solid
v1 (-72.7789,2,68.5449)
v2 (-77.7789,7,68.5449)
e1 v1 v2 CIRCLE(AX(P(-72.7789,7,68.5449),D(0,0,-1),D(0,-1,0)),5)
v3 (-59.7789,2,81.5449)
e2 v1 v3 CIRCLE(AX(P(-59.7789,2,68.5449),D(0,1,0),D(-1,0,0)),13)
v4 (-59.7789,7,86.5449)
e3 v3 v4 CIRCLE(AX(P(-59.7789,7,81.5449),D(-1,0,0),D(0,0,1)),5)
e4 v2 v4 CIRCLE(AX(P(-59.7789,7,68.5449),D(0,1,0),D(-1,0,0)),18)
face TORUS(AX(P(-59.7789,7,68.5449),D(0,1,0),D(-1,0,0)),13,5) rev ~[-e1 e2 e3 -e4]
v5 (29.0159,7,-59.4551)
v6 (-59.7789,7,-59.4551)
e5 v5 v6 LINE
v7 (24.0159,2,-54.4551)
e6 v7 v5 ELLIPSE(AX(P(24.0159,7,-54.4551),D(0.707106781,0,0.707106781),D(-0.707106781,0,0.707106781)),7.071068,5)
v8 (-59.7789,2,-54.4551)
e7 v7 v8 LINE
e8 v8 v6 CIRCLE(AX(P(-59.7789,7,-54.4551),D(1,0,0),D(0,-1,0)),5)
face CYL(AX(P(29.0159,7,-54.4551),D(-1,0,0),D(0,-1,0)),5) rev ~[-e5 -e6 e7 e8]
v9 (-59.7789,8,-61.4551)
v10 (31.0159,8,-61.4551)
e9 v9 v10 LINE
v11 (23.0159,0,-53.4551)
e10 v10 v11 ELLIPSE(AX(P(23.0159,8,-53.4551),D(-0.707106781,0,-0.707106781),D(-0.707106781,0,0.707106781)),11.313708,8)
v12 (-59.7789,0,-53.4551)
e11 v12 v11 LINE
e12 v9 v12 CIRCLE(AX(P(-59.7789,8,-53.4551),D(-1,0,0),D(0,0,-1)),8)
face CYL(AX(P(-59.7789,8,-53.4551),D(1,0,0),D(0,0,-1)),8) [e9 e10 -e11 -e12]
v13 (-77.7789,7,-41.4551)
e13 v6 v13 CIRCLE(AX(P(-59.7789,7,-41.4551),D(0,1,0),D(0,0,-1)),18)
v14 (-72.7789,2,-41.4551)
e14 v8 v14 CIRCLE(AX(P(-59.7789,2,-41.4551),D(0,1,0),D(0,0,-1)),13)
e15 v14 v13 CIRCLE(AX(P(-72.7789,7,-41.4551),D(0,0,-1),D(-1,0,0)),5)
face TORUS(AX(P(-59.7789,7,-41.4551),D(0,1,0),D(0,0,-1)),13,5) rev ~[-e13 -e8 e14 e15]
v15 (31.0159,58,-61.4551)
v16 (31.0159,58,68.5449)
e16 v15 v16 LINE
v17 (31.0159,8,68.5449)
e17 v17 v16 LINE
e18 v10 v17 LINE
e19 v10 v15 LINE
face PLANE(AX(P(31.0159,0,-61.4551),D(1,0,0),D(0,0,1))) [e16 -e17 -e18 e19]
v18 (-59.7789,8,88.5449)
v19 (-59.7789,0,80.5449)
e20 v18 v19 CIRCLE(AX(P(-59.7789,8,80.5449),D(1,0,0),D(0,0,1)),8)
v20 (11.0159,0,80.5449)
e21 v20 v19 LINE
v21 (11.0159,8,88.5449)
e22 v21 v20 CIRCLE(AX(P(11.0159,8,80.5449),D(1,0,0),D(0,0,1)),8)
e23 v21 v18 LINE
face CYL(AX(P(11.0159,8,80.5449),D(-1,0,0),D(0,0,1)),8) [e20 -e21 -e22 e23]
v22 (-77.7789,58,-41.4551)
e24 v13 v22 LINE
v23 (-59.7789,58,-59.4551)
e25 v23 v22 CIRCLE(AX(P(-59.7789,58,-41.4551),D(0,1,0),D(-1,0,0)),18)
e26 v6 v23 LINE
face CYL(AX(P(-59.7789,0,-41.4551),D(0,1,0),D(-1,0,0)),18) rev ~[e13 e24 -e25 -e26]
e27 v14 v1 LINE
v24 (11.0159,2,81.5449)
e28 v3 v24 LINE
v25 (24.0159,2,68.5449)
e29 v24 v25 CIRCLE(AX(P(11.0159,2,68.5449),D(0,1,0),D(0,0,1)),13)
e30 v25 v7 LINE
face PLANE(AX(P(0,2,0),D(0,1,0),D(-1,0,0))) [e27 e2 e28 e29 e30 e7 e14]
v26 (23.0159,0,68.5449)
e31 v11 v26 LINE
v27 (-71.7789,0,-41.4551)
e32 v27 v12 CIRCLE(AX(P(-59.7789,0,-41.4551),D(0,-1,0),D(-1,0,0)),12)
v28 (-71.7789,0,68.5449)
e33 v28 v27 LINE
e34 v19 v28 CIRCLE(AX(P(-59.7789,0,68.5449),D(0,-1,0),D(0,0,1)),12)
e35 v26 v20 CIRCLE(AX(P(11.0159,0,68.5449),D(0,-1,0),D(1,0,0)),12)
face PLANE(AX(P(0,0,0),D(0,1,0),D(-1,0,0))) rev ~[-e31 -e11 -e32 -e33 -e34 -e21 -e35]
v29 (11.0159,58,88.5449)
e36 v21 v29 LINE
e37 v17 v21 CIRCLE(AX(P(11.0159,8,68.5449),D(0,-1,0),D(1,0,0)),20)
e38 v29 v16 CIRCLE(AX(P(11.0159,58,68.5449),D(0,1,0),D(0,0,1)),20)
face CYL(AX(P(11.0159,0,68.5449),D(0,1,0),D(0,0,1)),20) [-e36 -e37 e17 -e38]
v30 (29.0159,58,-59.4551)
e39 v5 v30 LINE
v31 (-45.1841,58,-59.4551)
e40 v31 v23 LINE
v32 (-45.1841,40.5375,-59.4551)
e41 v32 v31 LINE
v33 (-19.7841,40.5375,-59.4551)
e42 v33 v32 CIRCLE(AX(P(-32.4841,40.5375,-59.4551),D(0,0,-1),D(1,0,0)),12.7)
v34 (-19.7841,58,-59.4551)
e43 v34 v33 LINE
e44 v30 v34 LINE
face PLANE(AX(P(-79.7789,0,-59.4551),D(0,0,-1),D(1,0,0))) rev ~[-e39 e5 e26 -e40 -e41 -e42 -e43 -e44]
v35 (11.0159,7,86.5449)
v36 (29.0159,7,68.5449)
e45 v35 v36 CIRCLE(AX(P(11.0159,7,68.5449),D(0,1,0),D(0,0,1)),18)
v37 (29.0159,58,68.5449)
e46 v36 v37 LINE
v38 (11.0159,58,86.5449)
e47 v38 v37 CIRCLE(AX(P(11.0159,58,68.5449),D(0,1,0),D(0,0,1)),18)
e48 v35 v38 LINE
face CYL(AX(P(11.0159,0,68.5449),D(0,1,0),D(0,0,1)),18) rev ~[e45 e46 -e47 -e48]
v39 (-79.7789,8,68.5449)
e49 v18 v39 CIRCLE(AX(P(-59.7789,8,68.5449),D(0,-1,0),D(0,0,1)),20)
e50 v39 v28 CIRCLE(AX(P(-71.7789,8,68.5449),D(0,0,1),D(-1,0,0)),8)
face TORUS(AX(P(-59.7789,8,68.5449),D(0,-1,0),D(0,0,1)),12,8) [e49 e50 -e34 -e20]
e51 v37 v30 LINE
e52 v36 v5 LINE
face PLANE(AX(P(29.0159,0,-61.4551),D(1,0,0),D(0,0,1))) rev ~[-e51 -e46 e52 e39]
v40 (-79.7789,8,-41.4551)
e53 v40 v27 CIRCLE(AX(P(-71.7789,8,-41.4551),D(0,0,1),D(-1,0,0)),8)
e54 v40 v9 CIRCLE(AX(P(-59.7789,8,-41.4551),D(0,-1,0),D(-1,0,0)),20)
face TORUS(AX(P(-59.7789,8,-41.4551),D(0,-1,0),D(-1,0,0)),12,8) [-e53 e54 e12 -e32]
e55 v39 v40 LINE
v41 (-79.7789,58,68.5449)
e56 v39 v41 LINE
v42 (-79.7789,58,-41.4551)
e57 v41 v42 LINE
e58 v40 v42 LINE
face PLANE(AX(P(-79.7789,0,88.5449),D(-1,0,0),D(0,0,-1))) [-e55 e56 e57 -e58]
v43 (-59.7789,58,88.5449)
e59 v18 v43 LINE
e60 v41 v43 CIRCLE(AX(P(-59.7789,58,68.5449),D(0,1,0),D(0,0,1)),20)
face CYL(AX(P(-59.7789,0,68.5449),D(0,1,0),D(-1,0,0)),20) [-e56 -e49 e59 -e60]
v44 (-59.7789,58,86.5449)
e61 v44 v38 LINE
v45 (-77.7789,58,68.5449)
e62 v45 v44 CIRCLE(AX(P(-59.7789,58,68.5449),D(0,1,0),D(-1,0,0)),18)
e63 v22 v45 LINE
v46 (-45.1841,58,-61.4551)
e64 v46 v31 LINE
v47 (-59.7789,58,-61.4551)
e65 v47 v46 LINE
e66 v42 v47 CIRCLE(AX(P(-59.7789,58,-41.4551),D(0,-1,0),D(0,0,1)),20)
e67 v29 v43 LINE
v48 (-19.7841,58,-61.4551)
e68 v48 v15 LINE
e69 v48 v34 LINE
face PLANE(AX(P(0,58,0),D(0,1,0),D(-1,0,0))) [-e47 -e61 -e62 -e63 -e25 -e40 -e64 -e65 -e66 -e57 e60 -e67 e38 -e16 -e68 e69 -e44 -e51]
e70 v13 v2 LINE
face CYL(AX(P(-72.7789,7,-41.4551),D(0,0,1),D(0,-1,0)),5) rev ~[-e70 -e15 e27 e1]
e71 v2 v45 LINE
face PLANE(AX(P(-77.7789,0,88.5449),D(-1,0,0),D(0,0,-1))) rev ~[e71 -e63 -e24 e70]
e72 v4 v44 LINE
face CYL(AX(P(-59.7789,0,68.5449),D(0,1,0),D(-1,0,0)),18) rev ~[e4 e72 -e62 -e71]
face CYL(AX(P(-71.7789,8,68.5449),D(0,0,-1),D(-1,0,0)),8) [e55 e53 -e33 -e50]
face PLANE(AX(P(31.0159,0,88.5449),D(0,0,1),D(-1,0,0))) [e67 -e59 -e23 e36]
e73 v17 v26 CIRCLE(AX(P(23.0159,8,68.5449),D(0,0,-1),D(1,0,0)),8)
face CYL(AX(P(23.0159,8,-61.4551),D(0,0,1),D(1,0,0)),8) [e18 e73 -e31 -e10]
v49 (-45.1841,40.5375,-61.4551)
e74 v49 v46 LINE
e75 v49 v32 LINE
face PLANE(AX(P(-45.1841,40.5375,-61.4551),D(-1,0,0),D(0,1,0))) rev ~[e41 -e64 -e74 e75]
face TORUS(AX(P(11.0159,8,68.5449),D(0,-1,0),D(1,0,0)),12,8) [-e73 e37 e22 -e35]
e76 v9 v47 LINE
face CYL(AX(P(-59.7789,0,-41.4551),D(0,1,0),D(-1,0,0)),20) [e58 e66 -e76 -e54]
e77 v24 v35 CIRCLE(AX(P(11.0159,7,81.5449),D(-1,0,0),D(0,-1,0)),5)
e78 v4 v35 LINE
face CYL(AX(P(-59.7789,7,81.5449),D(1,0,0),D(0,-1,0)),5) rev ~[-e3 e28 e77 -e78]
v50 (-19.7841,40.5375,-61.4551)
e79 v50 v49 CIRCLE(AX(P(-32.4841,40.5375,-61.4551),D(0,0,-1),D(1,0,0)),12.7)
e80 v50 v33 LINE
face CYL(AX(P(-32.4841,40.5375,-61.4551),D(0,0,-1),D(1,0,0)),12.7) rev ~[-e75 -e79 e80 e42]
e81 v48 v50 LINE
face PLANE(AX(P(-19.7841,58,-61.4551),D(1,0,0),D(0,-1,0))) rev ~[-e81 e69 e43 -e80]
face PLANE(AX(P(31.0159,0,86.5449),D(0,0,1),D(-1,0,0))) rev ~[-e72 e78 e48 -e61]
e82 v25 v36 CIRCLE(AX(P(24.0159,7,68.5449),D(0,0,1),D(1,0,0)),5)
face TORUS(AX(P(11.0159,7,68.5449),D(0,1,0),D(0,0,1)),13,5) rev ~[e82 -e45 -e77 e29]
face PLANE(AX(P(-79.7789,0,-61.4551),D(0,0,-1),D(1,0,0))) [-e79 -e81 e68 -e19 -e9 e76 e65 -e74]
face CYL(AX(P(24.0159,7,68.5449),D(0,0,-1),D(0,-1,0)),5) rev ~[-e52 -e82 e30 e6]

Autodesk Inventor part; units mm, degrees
ref_plane "YZ Plane" through (0, 0, 0) normal (1, 0, 0) x (0, 1, 0)
ref_plane "XZ Plane" through (0, 0, 0) normal (0, 1, 0) x (-1, 0, 0)
ref_plane "XY Plane" through (0, 0, 0) normal (0, 0, 1) x (1, 0, 0)
sketch "Sketch1" plane through (0, 0, 0) normal (0, 1, 0) x (-1, 0, 0)
  line L0 (79.7789, 88.5449) -> (79.7789, -61.4551)
  line L1 (79.7789, -61.4551) -> (-31.0159, -61.4551)
  line L2 (-31.0159, -61.4551) -> (-31.0159, 88.5449)
  line L3 (-31.0159, 88.5449) -> (79.7789, 88.5449)
  point P0 (0, 0)
  dimension "d0" = 150
  dimension "d1" = 110.7948
extrude "Body" add sketch "Sketch1" along normal blind 58
fillet "Fillet6" radius 20 1 edges at (-79.7789, 29, -61.4551)
fillet "Fillet4" radius 20 1 edges at (-79.7789, 29, 88.5449)
fillet "Fillet2" radius 20 1 edges at (31.0159, 29, 88.5449)
shell "Shell1" thickness 2 removed faces 1 at (-42.8473, 58, 31.8782)
sketch "Sketch6" plane through (31.0159, 0, -61.4551) normal (0, 0, -1) x (-1, 0, 0)
  line L0 (20.28, 18.92) -> (4.4, 18.92)
  line L1 (4.4, 18.92) -> (4.4, 5.42)
  line L2 (4.4, 5.42) -> (20.28, 5.42)
  line L3 (20.28, 5.42) -> (20.28, 18.92)
  line L4 (0, 9.95) -> (4.4, 9.95) construction
  line L5 (0, 0) -> (0, 58) projected
  line L6 (110.7948, 0) -> (0, 0) projected
  line L7 (15.1382, 0) -> (15.1382, 5.42)
  point P0 (20.28, 13.27)
  point P1 (11.2745, 5.42)
  dimension "d38" = 15.88
  dimension "d39" = 13.5
  dimension "d40" = 4.4
  dimension "d97" = 5.42
extrude "Cut_Ethernet" [suppressed]
sketch "Sketch5" plane through (31.0159, 0, -61.4551) normal (0, 0, -1) x (-1, 0, 0)
  line L0 (24.44, 21.12) -> (37.74, 21.12)
  line L1 (37.74, 21.12) -> (37.74, 5.42)
  line L2 (37.74, 5.42) -> (24.44, 5.42)
  line L3 (24.44, 5.42) -> (24.44, 21.12)
  line L4 (42.44, 10.5231) -> (37.74, 10.5231) construction
  line L5 (28.3152, 0) -> (28.3152, 5.42) construction
  line L6 (20.28, 18.92) -> (20.28, 5.42) projected
  line L7 (20.28, 10.8914) -> (24.44, 10.8914) construction
  line L8 (0, 0) -> (110.7948, 0) projected
  point P0 (31.0159, 0)
  point P1 (24.44, 13.27)
  dimension "d32" = 4.7
  dimension "d33" = 5.42
  dimension "d34" = 13.3
  dimension "d35" = 15.7
  dimension "d62" = 4.16
extrude "Cut_USB1" [suppressed]
sketch "Sketch4" plane through (31.0159, 0, -61.4551) normal (0, 0, -1) x (-1, 0, 0)
  line L0 (46.0437, 0) -> (46.0437, 5.42) construction
  line L1 (110.7948, 0) -> (110.7948, 58) projected
  line L2 (42.44, 5.42) -> (55.74, 5.42)
  line L3 (55.74, 5.42) -> (55.74, 21.12)
  line L4 (55.74, 21.12) -> (42.44, 21.12)
  line L5 (42.44, 21.12) -> (42.44, 5.42)
  line L6 (24.44, 21.12) -> (37.74, 21.12)
  line L7 (37.74, 21.12) -> (37.74, 5.42)
  line L8 (37.74, 5.42) -> (24.44, 5.42)
  line L9 (24.44, 5.42) -> (24.44, 21.12)
  line L10 (42.44, 10.5231) -> (37.74, 10.5231) construction
  line L11 (53.709, 2.22) -> (53.709, 5.42) construction
  line L12 (24.44, 13.27) -> (20.28, 13.27) construction
  line L13 (20.28, 18.92) -> (4.4, 18.92)
  line L14 (4.4, 18.92) -> (4.4, 5.42)
  line L15 (4.4, 5.42) -> (20.28, 5.42)
  line L16 (20.28, 5.42) -> (20.28, 18.92)
  line L17 (36.6745, 2.22) -> (36.6745, 5.42) construction
  line L18 (0, 0) -> (0, 58) projected
  line L19 (31.09, 0) -> (31.09, 5.42) construction
  line L20 (4.4, 5.42) -> (4.4, 18.92) projected
  line L21 (0, 0) -> (110.7948, 0) projected
  line L22 (13.4846, 5.42) -> (13.4846, 0) construction
  point P0 (31.0159, 0)
  point P1 (4.4, 12.17)
  dimension "d16" = 5.42
  dimension "d18" = 13.3
  dimension "d19" = 15.7
  dimension "d20" = 4.7
  dimension "d21" = 3.2
  dimension "d22" = 13.3
  dimension "d23" = 15.7
  dimension "d24" = 4.16
  dimension "d25" = 15.88
  dimension "d26" = 13.5
  dimension "d27" = 3.2
  dimension "d29" = 5.42
  dimension "d98" = 5.42
extrude "Cut_USB2" [suppressed]
fillet "Fillet10" radius 5 7 edges at (-77.7789, 2, 13.5449) (-72.5068, 2, 81.2728) (-24.3815, 2, 86.5449) (23.7438, 2, 81.2728) (29.0159, 2, 4.5449) (-72.5068, 2, -54.183) (-15.3815, 2, -59.4551)
fillet "Fillet9" radius 8 7 edges at (-14.3815, 0, -61.4551) (-73.921, 0, -55.5972) (-79.7789, 0, 13.5449) (-73.921, 0, 82.687) (-24.3815, 0, 88.5449) (25.158, 0, 82.687) (31.0159, 0, 3.5449)
sketch "Sketch13" plane through (-59.7789, 0, -61.4551) normal (0, 0, -1) x (-1, 0, 0)
  circle A0 centre (-59.7048, 47.625) radius 4.1 construction
  line L0 (-66.3548, 21.12) -> (-53.0548, 21.12) projected
  line L1 (-59.7048, 21.12) -> (-59.7048, 61.9125) construction
  line L2 (-79.7048, 53.975) -> (-39.7048, 53.975)
  line L3 (-39.7048, 53.975) -> (-39.7048, 25.4)
  line L4 (-39.7048, 25.4) -> (-79.7048, 25.4) construction
  line L5 (-79.7048, 25.4) -> (-79.7048, 53.975)
  line L6 (-79.7048, 39.6875) -> (-39.7048, 39.6875) construction
  line L7 (-79.7048, 42.1875) -> (-39.7048, 42.1875)
  line L8 (-39.7048, 42.1875) -> (-39.7048, 37.1875)
  line L9 (-39.7048, 37.1875) -> (-79.7048, 37.1875) construction
  line L10 (-79.7048, 37.1875) -> (-79.7048, 42.1875)
  line L11 (-74.6125, 42.1875) -> (-74.6125, 37.1875) construction
  line L12 (-79.7048, 42.1875) -> (-79.7048, 53.975)
  line L13 (-39.7048, 53.975) -> (-39.7048, 42.1875)
  point P0 (-59.7789, 0)
  point P1 (-59.7048, 53.975)
  dimension "d93" = 8.2
  dimension "d96" = 40
  dimension "d104" = 5
  dimension "d105" = 28.575
extrude "Extrusion13" [suppressed]
sketch "Sketch15" plane through (31.0159, 58, -61.4551) normal (0, 0, -1) x (-1, 0, 0)
  circle A0 centre (31.09, -10.375) radius 4.1 construction
  line L0 (24.44, -36.88) -> (37.74, -36.88)
  line L1 (31.09, -36.88) -> (31.09, 3.9125) construction
  line L2 (11.09, -4.025) -> (51.09, -4.025) construction
  line L3 (51.09, -4.025) -> (51.09, -32.6) construction
  line L4 (51.09, -32.6) -> (11.09, -32.6)
  line L5 (11.09, -32.6) -> (11.09, -4.025) construction
  line L6 (11.09, -18.3125) -> (51.09, -18.3125) construction
  line L7 (11.09, -15.8125) -> (51.09, -15.8125) construction
  line L8 (51.09, -15.8125) -> (51.09, -20.8125)
  line L9 (51.09, -20.8125) -> (11.09, -20.8125)
  line L10 (11.09, -20.8125) -> (11.09, -15.8125)
  line L11 (16.1823, -15.8125) -> (16.1823, -20.8125) construction
  line L12 (51.09, -4.025) -> (11.1125, -4.025) construction
  line L13 (11.09, -20.8125) -> (11.09, -32.6)
  line L14 (51.09, -32.6) -> (51.09, -20.8125)
  point P0 (31.0159, -58)
  point P1 (-59.7789, 0)
  point P2 (31.09, -4.025)
  dimension "d106" = 8.2
  dimension "d107" = 40
  dimension "d108" = 5
  dimension "d109" = 28.575
extrude "Extrusion14" [suppressed]
sketch "Sketch17" plane through (31.0159, 58, -61.4551) normal (0, 0, -1) x (-1, 0, 0)
  arc A0 (50.8, -17.4625) -> (76.2, -17.4625) centre (63.5, -17.4625) ccw
  line L0 (20, 0) -> (90.7948, 0) projected
  line L1 (50.8, -17.4625) -> (76.2, -17.4625) construction
  line L2 (76.2, -17.4625) -> (76.2, 0)
  line L3 (76.2, 0) -> (72.7075, 0)
  line L4 (50.8, 0) -> (50.8, -17.4625)
  line L5 (0, 0) -> (90.7948, 0) projected
  point P0 (31.0159, -58)
  dimension "d117" = 25.4
  dimension "d124" = 25.4
extrude "Extrusion16" cut sketch "Sketch17" against normal blind 2
properties part number "picaseV2"
